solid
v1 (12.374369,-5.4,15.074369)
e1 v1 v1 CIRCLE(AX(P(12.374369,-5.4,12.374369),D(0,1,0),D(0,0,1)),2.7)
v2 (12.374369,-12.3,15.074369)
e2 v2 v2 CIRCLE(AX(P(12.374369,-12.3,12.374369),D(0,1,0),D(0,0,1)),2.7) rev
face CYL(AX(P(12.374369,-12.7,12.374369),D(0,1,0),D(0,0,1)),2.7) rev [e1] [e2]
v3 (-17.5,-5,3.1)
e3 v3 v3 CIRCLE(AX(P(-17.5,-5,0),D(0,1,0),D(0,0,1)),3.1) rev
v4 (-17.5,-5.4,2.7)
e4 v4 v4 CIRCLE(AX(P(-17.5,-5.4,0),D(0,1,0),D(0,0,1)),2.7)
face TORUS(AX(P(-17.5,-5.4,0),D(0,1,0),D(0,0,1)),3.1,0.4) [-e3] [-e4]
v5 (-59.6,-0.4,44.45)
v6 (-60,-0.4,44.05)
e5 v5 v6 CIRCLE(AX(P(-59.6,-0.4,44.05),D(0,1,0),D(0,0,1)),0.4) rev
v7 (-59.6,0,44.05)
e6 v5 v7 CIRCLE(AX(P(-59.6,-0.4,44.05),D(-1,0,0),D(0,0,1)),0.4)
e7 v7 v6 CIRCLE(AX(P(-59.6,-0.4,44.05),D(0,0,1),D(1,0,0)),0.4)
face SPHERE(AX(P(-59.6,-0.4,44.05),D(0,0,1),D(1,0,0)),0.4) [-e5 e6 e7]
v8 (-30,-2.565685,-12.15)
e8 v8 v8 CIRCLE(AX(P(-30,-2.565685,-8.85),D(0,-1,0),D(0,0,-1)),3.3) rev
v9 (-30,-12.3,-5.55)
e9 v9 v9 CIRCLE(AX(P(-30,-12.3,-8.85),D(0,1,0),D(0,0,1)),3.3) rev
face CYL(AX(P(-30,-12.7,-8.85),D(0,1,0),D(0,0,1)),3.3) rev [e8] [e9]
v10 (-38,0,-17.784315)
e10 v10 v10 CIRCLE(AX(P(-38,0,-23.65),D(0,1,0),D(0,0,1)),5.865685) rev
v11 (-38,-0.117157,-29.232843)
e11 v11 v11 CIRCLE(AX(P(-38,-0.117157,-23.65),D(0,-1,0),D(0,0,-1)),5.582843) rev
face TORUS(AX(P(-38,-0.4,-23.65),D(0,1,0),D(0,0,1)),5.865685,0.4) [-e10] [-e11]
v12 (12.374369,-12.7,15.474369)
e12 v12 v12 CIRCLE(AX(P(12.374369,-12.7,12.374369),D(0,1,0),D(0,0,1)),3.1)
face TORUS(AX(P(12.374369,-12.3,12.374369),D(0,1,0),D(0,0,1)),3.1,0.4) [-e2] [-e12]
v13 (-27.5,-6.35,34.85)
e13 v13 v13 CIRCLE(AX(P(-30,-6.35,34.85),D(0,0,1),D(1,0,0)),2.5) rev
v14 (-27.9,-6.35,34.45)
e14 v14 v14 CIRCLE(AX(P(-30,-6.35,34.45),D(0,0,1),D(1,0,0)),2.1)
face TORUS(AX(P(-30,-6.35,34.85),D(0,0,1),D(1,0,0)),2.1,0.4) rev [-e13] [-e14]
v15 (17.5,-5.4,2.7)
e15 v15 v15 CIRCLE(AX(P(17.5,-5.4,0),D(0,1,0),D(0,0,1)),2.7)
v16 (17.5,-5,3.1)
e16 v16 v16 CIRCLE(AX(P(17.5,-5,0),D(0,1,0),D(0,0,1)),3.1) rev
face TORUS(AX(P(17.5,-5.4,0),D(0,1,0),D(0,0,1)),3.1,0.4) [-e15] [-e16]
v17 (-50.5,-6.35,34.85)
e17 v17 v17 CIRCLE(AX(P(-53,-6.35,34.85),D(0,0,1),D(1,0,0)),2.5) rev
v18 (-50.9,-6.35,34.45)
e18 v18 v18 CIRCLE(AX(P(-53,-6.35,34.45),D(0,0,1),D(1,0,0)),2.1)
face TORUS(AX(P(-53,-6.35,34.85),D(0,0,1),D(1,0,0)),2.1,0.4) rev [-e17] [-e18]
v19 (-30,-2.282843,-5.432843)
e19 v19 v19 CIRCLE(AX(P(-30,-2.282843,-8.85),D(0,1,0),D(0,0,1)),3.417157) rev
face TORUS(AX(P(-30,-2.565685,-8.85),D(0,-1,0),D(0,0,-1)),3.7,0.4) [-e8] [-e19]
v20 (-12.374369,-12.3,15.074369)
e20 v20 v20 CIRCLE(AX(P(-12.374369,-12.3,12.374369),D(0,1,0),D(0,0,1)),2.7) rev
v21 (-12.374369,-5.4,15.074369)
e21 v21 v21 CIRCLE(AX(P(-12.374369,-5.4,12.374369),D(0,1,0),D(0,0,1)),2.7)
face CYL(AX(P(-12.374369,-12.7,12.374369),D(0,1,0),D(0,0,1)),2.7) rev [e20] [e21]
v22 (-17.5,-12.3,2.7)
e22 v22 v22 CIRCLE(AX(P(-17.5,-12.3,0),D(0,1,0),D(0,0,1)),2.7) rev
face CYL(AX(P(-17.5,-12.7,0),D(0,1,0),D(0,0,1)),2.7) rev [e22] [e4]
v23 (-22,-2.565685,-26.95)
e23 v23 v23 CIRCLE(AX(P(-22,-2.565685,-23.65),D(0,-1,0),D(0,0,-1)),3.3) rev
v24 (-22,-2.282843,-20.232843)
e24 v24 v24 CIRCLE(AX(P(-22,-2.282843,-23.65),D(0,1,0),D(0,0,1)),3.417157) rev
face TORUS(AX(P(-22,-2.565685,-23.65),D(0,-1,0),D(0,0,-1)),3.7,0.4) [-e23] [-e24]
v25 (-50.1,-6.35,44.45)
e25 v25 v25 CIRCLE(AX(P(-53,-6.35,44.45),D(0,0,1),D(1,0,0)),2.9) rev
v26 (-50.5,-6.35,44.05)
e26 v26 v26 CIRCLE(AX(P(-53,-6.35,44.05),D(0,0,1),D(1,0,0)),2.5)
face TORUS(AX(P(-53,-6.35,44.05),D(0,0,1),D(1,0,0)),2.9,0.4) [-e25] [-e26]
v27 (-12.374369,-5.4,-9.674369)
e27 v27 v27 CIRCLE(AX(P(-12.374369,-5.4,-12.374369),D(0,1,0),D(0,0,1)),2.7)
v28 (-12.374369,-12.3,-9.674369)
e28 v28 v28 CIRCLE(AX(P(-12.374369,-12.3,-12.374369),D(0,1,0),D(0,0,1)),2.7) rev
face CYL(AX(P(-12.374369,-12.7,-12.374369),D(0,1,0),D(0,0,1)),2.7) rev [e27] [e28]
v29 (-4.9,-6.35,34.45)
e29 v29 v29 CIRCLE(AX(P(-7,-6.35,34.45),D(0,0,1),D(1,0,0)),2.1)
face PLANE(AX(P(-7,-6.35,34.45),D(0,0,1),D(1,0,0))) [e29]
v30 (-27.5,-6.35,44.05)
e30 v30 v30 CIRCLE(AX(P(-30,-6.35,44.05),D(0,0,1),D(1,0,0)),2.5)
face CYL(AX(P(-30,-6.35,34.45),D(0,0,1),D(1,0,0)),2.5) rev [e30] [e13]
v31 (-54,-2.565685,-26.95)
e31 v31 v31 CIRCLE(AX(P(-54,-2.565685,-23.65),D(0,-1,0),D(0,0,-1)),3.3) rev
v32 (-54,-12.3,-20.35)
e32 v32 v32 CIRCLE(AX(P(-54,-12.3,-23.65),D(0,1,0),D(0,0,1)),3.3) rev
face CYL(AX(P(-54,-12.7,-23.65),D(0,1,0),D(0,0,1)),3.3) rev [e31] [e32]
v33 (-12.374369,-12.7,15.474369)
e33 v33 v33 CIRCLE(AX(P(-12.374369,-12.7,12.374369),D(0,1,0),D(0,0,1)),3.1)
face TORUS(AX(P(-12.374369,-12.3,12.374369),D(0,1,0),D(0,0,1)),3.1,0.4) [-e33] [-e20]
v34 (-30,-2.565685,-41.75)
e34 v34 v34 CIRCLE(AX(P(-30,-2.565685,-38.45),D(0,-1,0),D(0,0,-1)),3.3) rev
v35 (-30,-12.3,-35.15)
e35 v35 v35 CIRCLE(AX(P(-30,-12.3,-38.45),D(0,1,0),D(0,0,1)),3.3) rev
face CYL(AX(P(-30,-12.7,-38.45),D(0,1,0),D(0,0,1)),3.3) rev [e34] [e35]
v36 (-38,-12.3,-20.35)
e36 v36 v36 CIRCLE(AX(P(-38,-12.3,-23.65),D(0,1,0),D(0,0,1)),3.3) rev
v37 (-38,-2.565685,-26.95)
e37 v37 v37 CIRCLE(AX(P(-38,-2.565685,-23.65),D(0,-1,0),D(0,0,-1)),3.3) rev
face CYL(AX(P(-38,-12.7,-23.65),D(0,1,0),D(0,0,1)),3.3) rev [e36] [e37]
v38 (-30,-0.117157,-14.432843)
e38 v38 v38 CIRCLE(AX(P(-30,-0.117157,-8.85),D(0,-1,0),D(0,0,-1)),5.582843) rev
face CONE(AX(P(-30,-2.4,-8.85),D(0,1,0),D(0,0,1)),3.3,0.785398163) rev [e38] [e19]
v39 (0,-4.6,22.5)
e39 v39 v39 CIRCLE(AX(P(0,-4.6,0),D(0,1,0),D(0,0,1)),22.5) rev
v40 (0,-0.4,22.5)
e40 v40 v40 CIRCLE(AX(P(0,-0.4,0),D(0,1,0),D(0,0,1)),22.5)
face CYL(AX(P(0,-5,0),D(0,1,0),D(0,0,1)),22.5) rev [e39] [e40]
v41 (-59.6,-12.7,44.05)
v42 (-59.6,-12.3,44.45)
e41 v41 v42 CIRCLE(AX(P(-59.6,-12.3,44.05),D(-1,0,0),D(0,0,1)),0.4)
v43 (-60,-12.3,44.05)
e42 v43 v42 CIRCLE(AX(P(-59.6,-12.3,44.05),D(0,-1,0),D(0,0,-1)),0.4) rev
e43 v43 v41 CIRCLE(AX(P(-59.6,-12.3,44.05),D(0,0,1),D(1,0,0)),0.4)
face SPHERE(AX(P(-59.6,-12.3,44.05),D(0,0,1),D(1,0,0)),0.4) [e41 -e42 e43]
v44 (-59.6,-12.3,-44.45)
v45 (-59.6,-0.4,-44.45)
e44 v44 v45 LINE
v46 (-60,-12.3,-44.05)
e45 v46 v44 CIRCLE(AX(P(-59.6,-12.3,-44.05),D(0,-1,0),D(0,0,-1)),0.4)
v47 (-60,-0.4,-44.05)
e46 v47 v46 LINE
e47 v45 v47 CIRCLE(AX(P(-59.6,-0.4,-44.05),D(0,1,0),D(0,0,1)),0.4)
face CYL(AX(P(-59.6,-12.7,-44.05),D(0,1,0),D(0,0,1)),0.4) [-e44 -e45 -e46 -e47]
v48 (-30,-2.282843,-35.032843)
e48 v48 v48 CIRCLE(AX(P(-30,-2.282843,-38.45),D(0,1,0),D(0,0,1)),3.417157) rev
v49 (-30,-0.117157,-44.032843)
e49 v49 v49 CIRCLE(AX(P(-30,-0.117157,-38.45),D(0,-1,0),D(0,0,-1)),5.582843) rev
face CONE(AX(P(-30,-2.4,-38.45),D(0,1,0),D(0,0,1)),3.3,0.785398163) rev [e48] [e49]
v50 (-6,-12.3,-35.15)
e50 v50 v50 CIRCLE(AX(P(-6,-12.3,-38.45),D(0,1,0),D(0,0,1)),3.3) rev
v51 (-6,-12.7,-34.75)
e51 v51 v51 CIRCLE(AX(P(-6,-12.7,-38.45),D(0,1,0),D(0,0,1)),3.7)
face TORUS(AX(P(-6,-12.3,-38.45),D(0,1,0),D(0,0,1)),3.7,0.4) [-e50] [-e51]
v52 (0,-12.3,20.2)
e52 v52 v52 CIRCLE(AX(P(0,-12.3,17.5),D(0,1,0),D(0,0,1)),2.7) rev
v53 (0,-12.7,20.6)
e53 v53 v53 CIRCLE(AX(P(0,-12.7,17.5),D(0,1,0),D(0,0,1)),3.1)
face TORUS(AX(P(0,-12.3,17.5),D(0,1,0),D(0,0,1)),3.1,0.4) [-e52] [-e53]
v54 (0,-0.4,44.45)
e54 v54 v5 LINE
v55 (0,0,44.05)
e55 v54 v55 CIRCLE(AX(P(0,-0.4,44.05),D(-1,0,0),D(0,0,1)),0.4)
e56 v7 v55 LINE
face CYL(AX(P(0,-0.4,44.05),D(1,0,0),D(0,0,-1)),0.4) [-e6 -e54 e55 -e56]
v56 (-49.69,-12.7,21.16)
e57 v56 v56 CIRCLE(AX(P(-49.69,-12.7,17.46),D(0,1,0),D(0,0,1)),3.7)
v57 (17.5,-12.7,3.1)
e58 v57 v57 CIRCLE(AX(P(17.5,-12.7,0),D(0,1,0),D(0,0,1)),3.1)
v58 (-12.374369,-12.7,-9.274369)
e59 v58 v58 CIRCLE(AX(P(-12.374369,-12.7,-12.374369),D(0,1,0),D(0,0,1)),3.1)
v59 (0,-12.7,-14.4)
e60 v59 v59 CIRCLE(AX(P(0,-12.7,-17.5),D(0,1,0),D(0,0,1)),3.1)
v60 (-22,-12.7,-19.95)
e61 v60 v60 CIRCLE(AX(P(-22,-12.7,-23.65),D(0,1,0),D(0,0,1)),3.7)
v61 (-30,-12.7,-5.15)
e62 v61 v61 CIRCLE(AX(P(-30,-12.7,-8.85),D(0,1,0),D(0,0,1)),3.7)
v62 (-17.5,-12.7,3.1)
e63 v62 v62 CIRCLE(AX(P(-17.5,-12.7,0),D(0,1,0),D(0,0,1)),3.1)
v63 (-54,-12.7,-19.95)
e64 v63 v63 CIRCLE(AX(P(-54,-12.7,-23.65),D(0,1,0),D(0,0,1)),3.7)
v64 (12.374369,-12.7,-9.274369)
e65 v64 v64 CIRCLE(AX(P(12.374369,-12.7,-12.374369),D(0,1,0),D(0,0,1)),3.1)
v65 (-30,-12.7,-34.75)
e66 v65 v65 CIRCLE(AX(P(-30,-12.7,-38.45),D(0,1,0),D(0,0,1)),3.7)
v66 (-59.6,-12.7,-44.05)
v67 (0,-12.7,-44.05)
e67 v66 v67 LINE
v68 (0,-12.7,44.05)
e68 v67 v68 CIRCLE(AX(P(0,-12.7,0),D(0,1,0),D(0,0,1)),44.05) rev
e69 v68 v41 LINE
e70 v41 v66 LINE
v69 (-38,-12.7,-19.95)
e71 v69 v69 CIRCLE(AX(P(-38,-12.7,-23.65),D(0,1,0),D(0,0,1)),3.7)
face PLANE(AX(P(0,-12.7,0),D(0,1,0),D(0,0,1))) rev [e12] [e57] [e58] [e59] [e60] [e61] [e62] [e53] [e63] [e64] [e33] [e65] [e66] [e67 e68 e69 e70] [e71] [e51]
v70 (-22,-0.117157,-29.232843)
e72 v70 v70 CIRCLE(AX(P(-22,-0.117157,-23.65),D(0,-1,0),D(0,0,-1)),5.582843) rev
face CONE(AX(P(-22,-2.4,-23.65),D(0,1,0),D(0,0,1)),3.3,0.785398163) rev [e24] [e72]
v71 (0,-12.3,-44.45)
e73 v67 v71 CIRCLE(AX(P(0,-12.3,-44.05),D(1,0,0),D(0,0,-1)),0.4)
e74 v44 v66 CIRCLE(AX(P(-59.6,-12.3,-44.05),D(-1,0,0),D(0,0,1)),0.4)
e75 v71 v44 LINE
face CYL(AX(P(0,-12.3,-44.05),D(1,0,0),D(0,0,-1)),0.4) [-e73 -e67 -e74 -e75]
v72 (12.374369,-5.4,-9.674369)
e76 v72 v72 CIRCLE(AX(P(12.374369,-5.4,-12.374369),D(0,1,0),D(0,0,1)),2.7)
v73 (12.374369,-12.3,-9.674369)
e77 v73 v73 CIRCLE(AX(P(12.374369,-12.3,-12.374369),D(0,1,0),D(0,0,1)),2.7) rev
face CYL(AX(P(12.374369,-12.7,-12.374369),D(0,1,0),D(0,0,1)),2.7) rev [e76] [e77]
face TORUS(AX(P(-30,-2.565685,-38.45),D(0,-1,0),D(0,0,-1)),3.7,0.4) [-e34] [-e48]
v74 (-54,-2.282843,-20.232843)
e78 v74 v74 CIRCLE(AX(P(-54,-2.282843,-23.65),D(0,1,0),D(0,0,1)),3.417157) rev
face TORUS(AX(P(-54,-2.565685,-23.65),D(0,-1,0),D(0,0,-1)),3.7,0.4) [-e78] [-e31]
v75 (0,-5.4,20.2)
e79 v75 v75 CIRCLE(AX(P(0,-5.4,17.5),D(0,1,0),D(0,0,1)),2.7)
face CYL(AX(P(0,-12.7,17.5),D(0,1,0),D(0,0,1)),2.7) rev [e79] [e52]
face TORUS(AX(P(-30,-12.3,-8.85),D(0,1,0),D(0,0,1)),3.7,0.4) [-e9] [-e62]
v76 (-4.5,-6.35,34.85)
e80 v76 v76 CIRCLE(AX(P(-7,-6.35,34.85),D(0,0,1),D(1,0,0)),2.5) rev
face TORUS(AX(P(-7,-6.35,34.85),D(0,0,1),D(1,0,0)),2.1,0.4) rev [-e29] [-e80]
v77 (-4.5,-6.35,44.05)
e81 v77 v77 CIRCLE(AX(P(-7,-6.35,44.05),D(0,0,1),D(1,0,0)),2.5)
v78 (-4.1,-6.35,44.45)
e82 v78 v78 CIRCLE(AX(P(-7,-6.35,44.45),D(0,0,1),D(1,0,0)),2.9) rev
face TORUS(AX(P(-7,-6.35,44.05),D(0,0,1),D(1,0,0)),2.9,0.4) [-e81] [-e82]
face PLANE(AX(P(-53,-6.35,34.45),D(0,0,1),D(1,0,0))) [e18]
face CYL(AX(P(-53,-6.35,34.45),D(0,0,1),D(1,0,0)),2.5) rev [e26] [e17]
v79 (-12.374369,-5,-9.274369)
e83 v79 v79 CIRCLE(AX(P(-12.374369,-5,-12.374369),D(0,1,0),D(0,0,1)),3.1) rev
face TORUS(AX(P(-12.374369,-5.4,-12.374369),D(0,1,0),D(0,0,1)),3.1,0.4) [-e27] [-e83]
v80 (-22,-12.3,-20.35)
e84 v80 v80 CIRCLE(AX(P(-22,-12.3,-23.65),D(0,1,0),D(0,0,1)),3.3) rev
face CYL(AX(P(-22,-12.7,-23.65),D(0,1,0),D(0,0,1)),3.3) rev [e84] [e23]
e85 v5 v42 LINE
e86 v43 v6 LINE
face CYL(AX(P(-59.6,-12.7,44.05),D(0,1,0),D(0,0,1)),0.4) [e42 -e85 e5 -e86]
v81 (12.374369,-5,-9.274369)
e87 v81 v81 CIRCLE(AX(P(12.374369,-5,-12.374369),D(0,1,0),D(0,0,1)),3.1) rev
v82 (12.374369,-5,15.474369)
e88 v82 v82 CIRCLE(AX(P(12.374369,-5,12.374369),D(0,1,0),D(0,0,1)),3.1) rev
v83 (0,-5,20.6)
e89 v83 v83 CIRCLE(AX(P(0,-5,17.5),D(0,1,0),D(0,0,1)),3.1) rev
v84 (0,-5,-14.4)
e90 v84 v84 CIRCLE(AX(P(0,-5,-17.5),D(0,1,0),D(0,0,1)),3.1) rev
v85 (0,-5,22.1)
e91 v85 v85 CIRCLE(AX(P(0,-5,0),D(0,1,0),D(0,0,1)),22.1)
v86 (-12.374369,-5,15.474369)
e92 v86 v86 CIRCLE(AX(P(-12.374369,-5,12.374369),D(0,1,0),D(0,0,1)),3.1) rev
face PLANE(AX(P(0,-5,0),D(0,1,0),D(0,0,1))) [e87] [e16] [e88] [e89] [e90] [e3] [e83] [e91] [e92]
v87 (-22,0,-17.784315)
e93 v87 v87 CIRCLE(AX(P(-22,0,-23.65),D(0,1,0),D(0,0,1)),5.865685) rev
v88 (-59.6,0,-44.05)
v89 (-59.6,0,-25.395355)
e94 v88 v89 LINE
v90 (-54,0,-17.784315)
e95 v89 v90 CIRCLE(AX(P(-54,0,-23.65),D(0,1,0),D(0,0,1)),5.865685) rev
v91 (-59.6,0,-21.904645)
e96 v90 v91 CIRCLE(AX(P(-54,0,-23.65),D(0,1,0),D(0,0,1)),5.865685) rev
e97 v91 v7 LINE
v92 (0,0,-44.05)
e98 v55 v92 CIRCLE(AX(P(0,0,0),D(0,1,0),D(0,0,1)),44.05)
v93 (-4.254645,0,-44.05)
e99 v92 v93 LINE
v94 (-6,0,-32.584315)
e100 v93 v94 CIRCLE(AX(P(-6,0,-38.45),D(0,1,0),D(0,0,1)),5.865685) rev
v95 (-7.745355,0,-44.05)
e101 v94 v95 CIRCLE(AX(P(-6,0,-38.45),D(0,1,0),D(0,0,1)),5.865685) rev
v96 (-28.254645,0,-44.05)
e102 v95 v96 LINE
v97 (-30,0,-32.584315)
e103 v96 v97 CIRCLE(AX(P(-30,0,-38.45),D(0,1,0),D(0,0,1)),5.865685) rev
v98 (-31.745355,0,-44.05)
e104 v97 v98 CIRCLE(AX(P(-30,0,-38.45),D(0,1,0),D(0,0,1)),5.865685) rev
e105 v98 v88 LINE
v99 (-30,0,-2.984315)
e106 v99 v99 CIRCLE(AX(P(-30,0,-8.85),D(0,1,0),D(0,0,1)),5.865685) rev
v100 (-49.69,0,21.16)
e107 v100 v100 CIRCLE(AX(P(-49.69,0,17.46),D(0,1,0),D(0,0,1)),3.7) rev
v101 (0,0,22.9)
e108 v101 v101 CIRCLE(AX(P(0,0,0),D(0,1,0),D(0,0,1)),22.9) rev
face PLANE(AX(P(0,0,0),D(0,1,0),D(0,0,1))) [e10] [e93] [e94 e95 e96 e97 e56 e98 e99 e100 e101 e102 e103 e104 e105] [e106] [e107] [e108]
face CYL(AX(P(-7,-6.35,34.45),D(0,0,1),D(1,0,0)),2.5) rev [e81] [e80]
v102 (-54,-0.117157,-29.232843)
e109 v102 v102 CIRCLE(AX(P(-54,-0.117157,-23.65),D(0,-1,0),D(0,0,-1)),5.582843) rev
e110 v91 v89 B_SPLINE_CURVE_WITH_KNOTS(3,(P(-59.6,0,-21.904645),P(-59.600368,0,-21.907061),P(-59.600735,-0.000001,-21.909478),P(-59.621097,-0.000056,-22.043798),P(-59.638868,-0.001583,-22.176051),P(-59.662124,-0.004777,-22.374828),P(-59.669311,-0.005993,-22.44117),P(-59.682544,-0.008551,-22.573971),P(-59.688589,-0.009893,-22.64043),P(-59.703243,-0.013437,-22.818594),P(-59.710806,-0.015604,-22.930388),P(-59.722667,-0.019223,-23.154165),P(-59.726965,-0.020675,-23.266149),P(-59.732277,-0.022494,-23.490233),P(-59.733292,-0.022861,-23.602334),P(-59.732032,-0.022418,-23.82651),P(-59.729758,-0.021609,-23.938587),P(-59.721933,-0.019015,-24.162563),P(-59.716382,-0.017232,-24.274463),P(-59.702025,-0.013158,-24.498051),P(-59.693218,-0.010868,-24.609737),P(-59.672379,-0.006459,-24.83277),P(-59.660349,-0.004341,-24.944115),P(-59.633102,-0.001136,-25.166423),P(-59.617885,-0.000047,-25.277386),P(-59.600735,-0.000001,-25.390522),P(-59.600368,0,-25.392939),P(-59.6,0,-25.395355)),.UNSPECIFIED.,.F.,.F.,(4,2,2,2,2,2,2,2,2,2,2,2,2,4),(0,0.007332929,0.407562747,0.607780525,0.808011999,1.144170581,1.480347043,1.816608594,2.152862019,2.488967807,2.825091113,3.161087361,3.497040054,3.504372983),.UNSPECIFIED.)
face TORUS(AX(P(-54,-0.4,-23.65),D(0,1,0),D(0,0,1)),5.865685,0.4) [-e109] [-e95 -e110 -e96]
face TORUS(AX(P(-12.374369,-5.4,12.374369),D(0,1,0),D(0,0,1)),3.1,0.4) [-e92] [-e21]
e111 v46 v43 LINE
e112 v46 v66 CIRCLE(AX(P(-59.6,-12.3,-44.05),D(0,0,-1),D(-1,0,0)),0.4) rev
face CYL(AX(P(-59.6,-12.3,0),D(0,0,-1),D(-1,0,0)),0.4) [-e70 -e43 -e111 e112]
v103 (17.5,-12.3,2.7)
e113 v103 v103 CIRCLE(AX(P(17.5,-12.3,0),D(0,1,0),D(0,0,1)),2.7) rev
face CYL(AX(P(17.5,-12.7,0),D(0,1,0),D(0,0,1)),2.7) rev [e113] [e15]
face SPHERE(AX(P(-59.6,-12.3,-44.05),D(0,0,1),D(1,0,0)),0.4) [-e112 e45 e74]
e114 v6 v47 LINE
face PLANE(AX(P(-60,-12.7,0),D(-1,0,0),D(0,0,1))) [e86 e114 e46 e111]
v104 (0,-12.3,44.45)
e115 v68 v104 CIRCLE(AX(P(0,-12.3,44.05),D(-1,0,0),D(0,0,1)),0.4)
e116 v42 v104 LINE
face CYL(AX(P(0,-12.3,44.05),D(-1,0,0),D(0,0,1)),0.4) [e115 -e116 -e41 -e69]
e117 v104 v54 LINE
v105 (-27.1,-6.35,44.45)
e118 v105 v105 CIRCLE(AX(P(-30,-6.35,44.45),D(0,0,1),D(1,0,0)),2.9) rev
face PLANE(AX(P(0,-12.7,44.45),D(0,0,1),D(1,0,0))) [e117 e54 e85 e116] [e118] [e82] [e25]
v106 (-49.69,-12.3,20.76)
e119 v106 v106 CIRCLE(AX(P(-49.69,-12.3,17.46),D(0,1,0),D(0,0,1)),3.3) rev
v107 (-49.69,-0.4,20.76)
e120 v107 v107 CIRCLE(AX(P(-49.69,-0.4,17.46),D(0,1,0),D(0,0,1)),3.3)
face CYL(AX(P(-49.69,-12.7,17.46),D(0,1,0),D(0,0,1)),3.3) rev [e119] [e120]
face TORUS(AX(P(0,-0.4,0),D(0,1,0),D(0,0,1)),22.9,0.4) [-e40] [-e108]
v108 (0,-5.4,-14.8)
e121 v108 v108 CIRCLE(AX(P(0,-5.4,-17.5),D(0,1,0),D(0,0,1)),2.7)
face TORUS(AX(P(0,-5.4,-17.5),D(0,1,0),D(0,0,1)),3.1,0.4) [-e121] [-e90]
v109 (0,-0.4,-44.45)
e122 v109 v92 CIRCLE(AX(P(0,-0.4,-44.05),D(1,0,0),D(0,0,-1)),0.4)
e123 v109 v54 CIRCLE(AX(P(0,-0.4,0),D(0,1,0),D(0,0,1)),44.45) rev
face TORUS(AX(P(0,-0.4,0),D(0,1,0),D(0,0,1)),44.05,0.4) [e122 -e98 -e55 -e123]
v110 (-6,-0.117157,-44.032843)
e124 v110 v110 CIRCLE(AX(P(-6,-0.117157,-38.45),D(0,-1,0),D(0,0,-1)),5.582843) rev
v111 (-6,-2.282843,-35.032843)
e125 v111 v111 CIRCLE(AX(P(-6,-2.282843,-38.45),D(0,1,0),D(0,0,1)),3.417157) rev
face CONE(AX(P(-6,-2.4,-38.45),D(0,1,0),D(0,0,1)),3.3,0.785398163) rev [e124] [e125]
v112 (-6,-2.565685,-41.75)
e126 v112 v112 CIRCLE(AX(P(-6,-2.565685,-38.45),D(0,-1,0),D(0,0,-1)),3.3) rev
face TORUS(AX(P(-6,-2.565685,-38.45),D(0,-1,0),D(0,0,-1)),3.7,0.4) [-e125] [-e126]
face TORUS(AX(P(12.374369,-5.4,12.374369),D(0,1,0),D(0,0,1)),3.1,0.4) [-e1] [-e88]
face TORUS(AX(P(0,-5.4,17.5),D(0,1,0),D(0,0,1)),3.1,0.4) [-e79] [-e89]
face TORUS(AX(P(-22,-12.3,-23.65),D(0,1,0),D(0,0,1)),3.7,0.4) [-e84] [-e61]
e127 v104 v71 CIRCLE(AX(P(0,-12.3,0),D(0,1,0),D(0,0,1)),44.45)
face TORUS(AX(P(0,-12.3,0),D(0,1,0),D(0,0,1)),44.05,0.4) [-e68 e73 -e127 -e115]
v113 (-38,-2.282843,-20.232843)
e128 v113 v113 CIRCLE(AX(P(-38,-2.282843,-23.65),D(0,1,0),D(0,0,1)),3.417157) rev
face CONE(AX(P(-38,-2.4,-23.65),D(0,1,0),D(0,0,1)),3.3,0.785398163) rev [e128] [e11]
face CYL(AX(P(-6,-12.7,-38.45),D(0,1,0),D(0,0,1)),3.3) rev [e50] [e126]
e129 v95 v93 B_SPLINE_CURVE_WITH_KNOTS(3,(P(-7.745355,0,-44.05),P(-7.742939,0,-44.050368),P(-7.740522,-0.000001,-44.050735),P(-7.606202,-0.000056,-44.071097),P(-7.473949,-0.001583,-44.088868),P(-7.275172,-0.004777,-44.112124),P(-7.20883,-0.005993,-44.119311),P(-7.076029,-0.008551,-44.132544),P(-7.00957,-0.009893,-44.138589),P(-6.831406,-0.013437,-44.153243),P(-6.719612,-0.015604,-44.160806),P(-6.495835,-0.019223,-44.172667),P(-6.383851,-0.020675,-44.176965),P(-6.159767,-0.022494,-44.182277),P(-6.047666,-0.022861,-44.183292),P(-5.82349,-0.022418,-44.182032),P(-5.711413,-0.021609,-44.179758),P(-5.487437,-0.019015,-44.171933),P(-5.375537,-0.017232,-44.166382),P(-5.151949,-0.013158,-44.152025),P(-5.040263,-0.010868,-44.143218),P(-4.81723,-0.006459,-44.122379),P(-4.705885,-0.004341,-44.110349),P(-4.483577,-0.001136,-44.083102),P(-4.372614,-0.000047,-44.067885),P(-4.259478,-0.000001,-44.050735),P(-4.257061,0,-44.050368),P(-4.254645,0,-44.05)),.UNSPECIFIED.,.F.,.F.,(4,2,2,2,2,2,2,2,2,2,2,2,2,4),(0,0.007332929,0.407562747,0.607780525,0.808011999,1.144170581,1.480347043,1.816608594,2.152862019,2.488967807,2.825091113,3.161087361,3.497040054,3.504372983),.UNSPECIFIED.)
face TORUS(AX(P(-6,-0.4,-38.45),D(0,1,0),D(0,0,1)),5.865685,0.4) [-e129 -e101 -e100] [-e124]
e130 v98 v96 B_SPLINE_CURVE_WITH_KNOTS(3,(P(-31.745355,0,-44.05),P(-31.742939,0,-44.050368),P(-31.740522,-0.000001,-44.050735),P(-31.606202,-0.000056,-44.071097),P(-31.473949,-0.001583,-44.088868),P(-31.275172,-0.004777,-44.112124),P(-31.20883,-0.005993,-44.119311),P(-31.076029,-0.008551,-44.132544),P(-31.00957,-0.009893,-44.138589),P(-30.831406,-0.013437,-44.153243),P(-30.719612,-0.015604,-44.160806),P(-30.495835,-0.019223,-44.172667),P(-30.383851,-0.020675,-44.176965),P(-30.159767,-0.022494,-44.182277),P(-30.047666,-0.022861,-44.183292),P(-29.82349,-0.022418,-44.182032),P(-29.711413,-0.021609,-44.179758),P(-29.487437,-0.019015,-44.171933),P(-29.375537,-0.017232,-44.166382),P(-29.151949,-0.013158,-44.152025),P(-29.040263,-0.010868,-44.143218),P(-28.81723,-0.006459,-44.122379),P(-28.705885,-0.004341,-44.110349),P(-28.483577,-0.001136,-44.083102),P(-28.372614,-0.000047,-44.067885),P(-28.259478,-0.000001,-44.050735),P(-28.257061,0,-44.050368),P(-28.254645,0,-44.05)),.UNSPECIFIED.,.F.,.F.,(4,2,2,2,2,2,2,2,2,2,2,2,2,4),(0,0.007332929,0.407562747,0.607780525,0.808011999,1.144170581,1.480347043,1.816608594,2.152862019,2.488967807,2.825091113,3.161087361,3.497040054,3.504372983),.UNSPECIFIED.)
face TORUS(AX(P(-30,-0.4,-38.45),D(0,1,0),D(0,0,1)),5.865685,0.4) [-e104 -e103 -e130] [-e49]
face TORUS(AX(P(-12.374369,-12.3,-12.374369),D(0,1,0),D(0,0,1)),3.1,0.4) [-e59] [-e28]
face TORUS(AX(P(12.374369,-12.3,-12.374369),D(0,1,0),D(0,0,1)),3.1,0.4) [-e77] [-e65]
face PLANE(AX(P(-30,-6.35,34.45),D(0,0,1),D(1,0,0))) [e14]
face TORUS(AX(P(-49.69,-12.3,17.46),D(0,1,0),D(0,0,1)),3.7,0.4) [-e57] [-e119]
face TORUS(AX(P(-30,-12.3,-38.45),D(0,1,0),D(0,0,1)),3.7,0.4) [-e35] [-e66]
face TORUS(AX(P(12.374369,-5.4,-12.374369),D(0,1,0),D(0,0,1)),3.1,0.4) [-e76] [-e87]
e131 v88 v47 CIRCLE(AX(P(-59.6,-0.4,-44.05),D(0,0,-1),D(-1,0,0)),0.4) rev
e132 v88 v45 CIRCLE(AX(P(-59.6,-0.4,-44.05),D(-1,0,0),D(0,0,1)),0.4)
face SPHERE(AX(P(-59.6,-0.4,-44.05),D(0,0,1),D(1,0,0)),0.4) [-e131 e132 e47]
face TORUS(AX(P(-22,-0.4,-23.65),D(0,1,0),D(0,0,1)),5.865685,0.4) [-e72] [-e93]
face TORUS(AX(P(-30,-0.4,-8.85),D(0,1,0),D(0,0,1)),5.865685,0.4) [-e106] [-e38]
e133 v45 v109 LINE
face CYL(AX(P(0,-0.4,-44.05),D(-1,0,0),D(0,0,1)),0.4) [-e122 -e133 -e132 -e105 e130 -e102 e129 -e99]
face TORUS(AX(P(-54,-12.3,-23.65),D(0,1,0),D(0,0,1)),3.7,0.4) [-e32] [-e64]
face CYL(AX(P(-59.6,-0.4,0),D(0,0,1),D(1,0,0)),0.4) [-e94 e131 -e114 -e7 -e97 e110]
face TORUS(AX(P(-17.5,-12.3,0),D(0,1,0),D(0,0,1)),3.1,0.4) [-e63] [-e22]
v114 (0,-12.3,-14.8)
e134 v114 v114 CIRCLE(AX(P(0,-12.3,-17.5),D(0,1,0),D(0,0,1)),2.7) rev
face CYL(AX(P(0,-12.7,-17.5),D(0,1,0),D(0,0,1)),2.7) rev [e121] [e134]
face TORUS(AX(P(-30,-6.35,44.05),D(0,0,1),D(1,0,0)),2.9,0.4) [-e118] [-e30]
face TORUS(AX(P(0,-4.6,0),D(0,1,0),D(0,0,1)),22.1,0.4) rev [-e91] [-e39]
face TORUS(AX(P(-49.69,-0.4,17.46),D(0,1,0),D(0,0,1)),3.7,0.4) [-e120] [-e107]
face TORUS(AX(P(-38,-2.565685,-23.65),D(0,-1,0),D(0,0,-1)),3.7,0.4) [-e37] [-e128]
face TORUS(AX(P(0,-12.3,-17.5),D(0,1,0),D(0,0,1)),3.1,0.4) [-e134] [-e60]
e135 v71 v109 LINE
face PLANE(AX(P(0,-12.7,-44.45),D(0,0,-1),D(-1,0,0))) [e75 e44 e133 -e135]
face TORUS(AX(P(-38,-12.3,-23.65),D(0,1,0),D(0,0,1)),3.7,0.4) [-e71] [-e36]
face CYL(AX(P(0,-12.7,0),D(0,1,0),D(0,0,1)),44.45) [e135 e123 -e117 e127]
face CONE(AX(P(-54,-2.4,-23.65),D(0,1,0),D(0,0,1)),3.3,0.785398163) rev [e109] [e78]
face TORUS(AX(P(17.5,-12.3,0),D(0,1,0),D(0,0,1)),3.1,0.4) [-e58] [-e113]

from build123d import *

# Parameters (mm, degrees)
SKETCH1_R           = 3.3
SKETCH1_R_2         = 22.5
SKETCH1_R_3         = 2.7
BOSS_EXTRUDE1_DEPTH = 12.7
CHAMFER2_SIZE       = 2.4
SKETCH1_3_R         = 22.5
CUT_EXTRUDE1_DEPTH  = 5
SKETCH2_R           = 2.5
CUT_EXTRUDE2_DEPTH  = 10
FILLET1_R           = 0.4


with BuildPart() as part:
    # Sketch1 → Boss-Extrude1 (new body)
    # profile 1 of 2: a face of its own
    with BuildSketch(Plane(origin=(0, 0, 0), x_dir=(1, 0, 0), z_dir=(0, 1, 0))):
        with BuildLine():
            Line((-60, -44.45), (0, -44.45))
            ThreePointArc((0, -44.45), (44.45, 0), (0, 44.45))
            Line((0, 44.45), (-60, 44.45))
            Line((-60, 44.45), (-60, -44.45))
        make_face()
        with Locations(Location((-49.69, -17.46, 0), (0, 0, 270))):
            Circle(SKETCH1_R, mode=Mode.SUBTRACT)
        with Locations(Location((-54, 23.65, 0), (0, 0, 270))):
            Circle(SKETCH1_R, mode=Mode.SUBTRACT)
        with Locations(Location((-6, 38.45, 0), (0, 0, 270))):
            Circle(SKETCH1_R, mode=Mode.SUBTRACT)
        with Locations(Location((-38, 23.65, 0), (0, 0, 270))):
            Circle(SKETCH1_R, mode=Mode.SUBTRACT)
        with Locations(Location((-22, 23.65, 0), (0, 0, 270))):
            Circle(SKETCH1_R, mode=Mode.SUBTRACT)
        with Locations(Location((-30, 8.85, 0), (0, 0, 270))):
            Circle(SKETCH1_R, mode=Mode.SUBTRACT)
        with Locations(Location((-30, 38.45, 0), (0, 0, 270))):
            Circle(SKETCH1_R, mode=Mode.SUBTRACT)
        Circle(SKETCH1_R_2, mode=Mode.SUBTRACT)
    # profile 2 of 2: a face of its own
    with BuildSketch(Plane(origin=(0, 0, 0), x_dir=(1, 0, 0), z_dir=(0, 1, 0))):
        Circle(SKETCH1_R_2)
        with Locations(Location((17.5, 0, 0), (0, 0, 270))):
            Circle(SKETCH1_R_3, mode=Mode.SUBTRACT)
        with Locations(Location((12.374368671, -12.374368671, 0), (0, 0, 270))):
            Circle(SKETCH1_R_3, mode=Mode.SUBTRACT)
        with Locations(Location((0, -17.5, 0), (0, 0, 270))):
            Circle(SKETCH1_R_3, mode=Mode.SUBTRACT)
        with Locations(Location((-12.374368671, -12.374368671, 0), (0, 0, 270))):
            Circle(SKETCH1_R_3, mode=Mode.SUBTRACT)
        with Locations(Location((-17.5, 0, 0), (0, 0, 270))):
            Circle(SKETCH1_R_3, mode=Mode.SUBTRACT)
        with Locations(Location((-12.374368671, 12.374368671, 0), (0, 0, 270))):
            Circle(SKETCH1_R_3, mode=Mode.SUBTRACT)
        with Locations(Location((0, 17.5, 0), (0, 0, 270))):
            Circle(SKETCH1_R_3, mode=Mode.SUBTRACT)
        with Locations(Location((12.374368671, 12.374368671, 0), (0, 0, 270))):
            Circle(SKETCH1_R_3, mode=Mode.SUBTRACT)
    extrude(amount=-BOSS_EXTRUDE1_DEPTH)

    # Chamfer2
    chamfer2_edges = [part.edges().sort_by_distance(p)[0] for p in [
        (-30, 0, -41.75),
        (-30, 0, -12.15),
        (-22, 0, -26.95),
        (-38, 0, -26.95),
        (-6, 0, -41.75),
        (-54, 0, -26.95),
    ]]
    chamfer(chamfer2_edges, length=CHAMFER2_SIZE)

    # Sketch1<3> → Cut-Extrude1 (cut)
    with BuildSketch(Plane(origin=(0, 0, 0), x_dir=(1, 0, 0), z_dir=(0, 1, 0))):
        with Locations(Location((0, 0, 0), (0, 0, 270))):
            Circle(SKETCH1_3_R)
    extrude(amount=-CUT_EXTRUDE1_DEPTH, mode=Mode.SUBTRACT)

    # Sketch2 → Cut-Extrude2 (cut)
    with BuildSketch(Plane.XY.offset(44.45)):
        with Locations((-7, -6.35)):
            Circle(SKETCH2_R)
        with Locations((-30, -6.35)):
            Circle(SKETCH2_R)
        with Locations((-53, -6.35)):
            Circle(SKETCH2_R)
    extrude(amount=-CUT_EXTRUDE2_DEPTH, mode=Mode.SUBTRACT)

    # Fillet1
    # the kernel refuses this fillet: 0.4 mm, written as the material it adds along each edge
    with BuildSketch(Plane(origin=(-7, -6.35, 34.45), x_dir=(1, 0, 0), z_dir=(0, -1, 0))) as fillet1_piece_1:
        with BuildLine():
            CenterArc((2.5 - FILLET1_R, FILLET1_R), FILLET1_R, 270, 90)
            Line((2.5 - FILLET1_R, 0), (2.5, 0))
            Line((2.5, 0), (2.5, FILLET1_R))
        make_face()
    revolve(axis=Axis((-7, -6.35, 34.45), (0, 0, 1)))
    with BuildSketch(Plane(origin=(-30, -6.35, 34.45), x_dir=(1, 0, 0), z_dir=(0, -1, 0))) as fillet1_piece_2:
        with BuildLine():
            CenterArc((2.5 - FILLET1_R, FILLET1_R), FILLET1_R, 270, 90)
            Line((2.5 - FILLET1_R, 0), (2.5, 0))
            Line((2.5, 0), (2.5, FILLET1_R))
        make_face()
    revolve(axis=Axis((-30, -6.35, 34.45), (0, 0, 1)))
    with BuildSketch(Plane(origin=(-53, -6.35, 34.45), x_dir=(1, 0, 0), z_dir=(0, -1, 0))) as fillet1_piece_3:
        with BuildLine():
            CenterArc((2.5 - FILLET1_R, FILLET1_R), FILLET1_R, 270, 90)
            Line((2.5 - FILLET1_R, 0), (2.5, 0))
            Line((2.5, 0), (2.5, FILLET1_R))
        make_face()
    revolve(axis=Axis((-53, -6.35, 34.45), (0, 0, 1)))
    with BuildSketch(Plane(origin=(0, -5, 0), x_dir=(0, 0, 1), z_dir=(-1, 0, 0))) as fillet1_piece_4:
        with BuildLine():
            CenterArc((22.5 - FILLET1_R, FILLET1_R), FILLET1_R, 270, 90)
            Line((22.5 - FILLET1_R, 0), (22.5, 0))
            Line((22.5, 0), (22.5, FILLET1_R))
        make_face()
    revolve(axis=Axis((0, -5, 0), (0, 1, 0)))
    # the kernel refuses this fillet: 0.4 mm, written as the material it takes off along each edge
    with BuildSketch(Plane(origin=(-59.6, -0.4, -44.05), x_dir=(0, 0, -1), z_dir=(0, 1, 0))) as fillet1_2_piece_1_section:
        Polygon((0, 0), (FILLET1_R, 0), (FILLET1_R, FILLET1_R), (0, FILLET1_R), align=None)
    fillet1_2_piece_1 = extrude(amount=FILLET1_R, mode=Mode.PRIVATE)
    fillet1_2_piece_1 = fillet1_2_piece_1 - Plane(origin=(-59.6, -0.4, -44.05), x_dir=(0.7071067811865475, 0, 0.7071067811865475), z_dir=(0, 1, 0)) * Sphere(FILLET1_R, mode=Mode.PRIVATE)
    add(fillet1_2_piece_1, mode=Mode.SUBTRACT)
    with BuildSketch(Plane(origin=(-59.6, -0.4, 44.05), x_dir=(-1, 0, 0), z_dir=(0, 1, 0))) as fillet1_2_piece_2_section:
        Polygon((0, 0), (FILLET1_R, 0), (FILLET1_R, FILLET1_R), (0, FILLET1_R), align=None)
    fillet1_2_piece_2 = extrude(amount=FILLET1_R, mode=Mode.PRIVATE)
    fillet1_2_piece_2 = fillet1_2_piece_2 - Plane(origin=(-59.6, -0.4, 44.05), x_dir=(0.7071067811865475, 0, -0.7071067811865475), z_dir=(0, 1, 0)) * Sphere(FILLET1_R, mode=Mode.PRIVATE)
    add(fillet1_2_piece_2, mode=Mode.SUBTRACT)
    with BuildSketch(Plane(origin=(-59.6, -12.3, 44.05), x_dir=(0, 0, 1), z_dir=(-1, 0, 0))) as fillet1_2_piece_3_section:
        Polygon((0, 0), (FILLET1_R, 0), (FILLET1_R, -FILLET1_R), (0, -FILLET1_R), align=None)
    fillet1_2_piece_3 = extrude(amount=FILLET1_R, mode=Mode.PRIVATE)
    fillet1_2_piece_3 = fillet1_2_piece_3 - Plane(origin=(-59.6, -12.3, 44.05), x_dir=(0, 0.7071067811865475, -0.7071067811865475), z_dir=(-1, 0, 0)) * Sphere(FILLET1_R, mode=Mode.PRIVATE)
    add(fillet1_2_piece_3, mode=Mode.SUBTRACT)
    with BuildSketch(Plane(origin=(-59.6, -12.3, -44.05), x_dir=(-1, 0, 0), z_dir=(0, 0, -1))) as fillet1_2_piece_4_section:
        Polygon((0, 0), (FILLET1_R, 0), (FILLET1_R, -FILLET1_R), (0, -FILLET1_R), align=None)
    fillet1_2_piece_4 = extrude(amount=FILLET1_R, mode=Mode.PRIVATE)
    fillet1_2_piece_4 = fillet1_2_piece_4 - Plane(origin=(-59.6, -12.3, -44.05), x_dir=(0.7071067811865475, 0.7071067811865475, 0), z_dir=(0, 0, -1)) * Sphere(FILLET1_R, mode=Mode.PRIVATE)
    add(fillet1_2_piece_4, mode=Mode.SUBTRACT)
    with BuildSketch(Plane(origin=(-7, -6.35, 44.45), x_dir=(1, 0, 0), z_dir=(0, -1, 0))) as fillet1_2_piece_5:
        with BuildLine():
            CenterArc((2.5 + FILLET1_R, -FILLET1_R), FILLET1_R, 90, 90)
            Line((2.5, -FILLET1_R), (2.5, 0))
            Line((2.5, 0), (2.5 + FILLET1_R, 0))
        make_face()
    revolve(axis=Axis((-7, -6.35, 44.45), (0, 0, 1)), mode=Mode.SUBTRACT)
    with BuildSketch(Plane(origin=(-30, -6.35, 44.45), x_dir=(1, 0, 0), z_dir=(0, -1, 0))) as fillet1_2_piece_6:
        with BuildLine():
            CenterArc((2.5 + FILLET1_R, -FILLET1_R), FILLET1_R, 90, 90)
            Line((2.5, -FILLET1_R), (2.5, 0))
            Line((2.5, 0), (2.5 + FILLET1_R, 0))
        make_face()
    revolve(axis=Axis((-30, -6.35, 44.45), (0, 0, 1)), mode=Mode.SUBTRACT)
    with BuildSketch(Plane(origin=(-53, -6.35, 44.45), x_dir=(1, 0, 0), z_dir=(0, -1, 0))) as fillet1_2_piece_7:
        with BuildLine():
            CenterArc((2.5 + FILLET1_R, -FILLET1_R), FILLET1_R, 90, 90)
            Line((2.5, -FILLET1_R), (2.5, 0))
            Line((2.5, 0), (2.5 + FILLET1_R, 0))
        make_face()
    revolve(axis=Axis((-53, -6.35, 44.45), (0, 0, 1)), mode=Mode.SUBTRACT)
    with BuildSketch(Plane(origin=(-49.69, -12.7, 17.46), x_dir=(0, 0, 1), z_dir=(-1, 0, 0))) as fillet1_2_piece_8:
        with BuildLine():
            CenterArc((3.3 + FILLET1_R, FILLET1_R), FILLET1_R, 180, 90)
            Line((3.3 + FILLET1_R, 0), (3.3, 0))
            Line((3.3, 0), (3.3, FILLET1_R))
        make_face()
    revolve(axis=Axis((-49.69, -12.7, 17.46), (0, 1, 0)), mode=Mode.SUBTRACT)
    with BuildSketch(Plane(origin=(-54, -12.7, -23.65), x_dir=(0, 0, 1), z_dir=(-1, 0, 0))) as fillet1_2_piece_9:
        with BuildLine():
            CenterArc((3.3 + FILLET1_R, FILLET1_R), FILLET1_R, 180, 90)
            Line((3.3, FILLET1_R), (3.3, 0))
            Line((3.3, 0), (3.3 + FILLET1_R, 0))
        make_face()
    revolve(axis=Axis((-54, -12.7, -23.65), (0, 1, 0)), mode=Mode.SUBTRACT)
    with BuildSketch(Plane(origin=(-60, 0, -44.05), x_dir=(1, 0, 0), z_dir=(0, 0, 1)), Plane(origin=(-60, -12.7, -44.05), x_dir=(0, 1, 0), z_dir=(0, 0, 1))) as fillet1_2_piece_10:
        with BuildLine():
            CenterArc((FILLET1_R, -FILLET1_R), FILLET1_R, 90, 90)
            Line((0, -FILLET1_R), (0, 0))
            Line((0, 0), (FILLET1_R, 0))
        make_face()
    extrude(amount=88.1, mode=Mode.SUBTRACT)
    with BuildSketch(Plane(origin=(0, 0, -44.45), x_dir=(0, 0, 1), z_dir=(-1, 0, 0)), Plane(origin=(-59.6, 0, 44.45), x_dir=(0, 0, -1), z_dir=(1, 0, 0)), Plane(origin=(-59.6, -12.7, 44.45), x_dir=(0, 1, 0), z_dir=(1, 0, 0)), Plane(origin=(0, -12.7, -44.45), x_dir=(0, 1, 0), z_dir=(-1, 0, 0))) as fillet1_2_piece_11:
        with BuildLine():
            CenterArc((FILLET1_R, -FILLET1_R), FILLET1_R, 90, 90)
            Line((0, -FILLET1_R), (0, 0))
            Line((0, 0), (FILLET1_R, 0))
        make_face()
    extrude(amount=59.6, mode=Mode.SUBTRACT)
    with BuildSketch(Plane(origin=(0, 0, 0), x_dir=(0, 0, 1), z_dir=(-1, 0, 0))) as fillet1_2_piece_12:
        with BuildLine():
            CenterArc((44.45 - FILLET1_R, -FILLET1_R), FILLET1_R, 0, 90)
            Line((44.45, -FILLET1_R), (44.45, 0))
            Line((44.45, 0), (44.45 - FILLET1_R, 0))
        make_face()
    revolve(axis=Axis((0, 0, 0), (0, 1, 0)), revolution_arc=180, mode=Mode.SUBTRACT)
    with BuildSketch(Plane(origin=(-6, -12.7, -38.45), x_dir=(0, 0, 1), z_dir=(-1, 0, 0))) as fillet1_2_piece_13:
        with BuildLine():
            CenterArc((3.3 + FILLET1_R, FILLET1_R), FILLET1_R, 180, 90)
            Line((3.3, FILLET1_R), (3.3, 0))
            Line((3.3, 0), (3.3 + FILLET1_R, 0))
        make_face()
    revolve(axis=Axis((-6, -12.7, -38.45), (0, 1, 0)), mode=Mode.SUBTRACT)
    with BuildSketch(Plane(origin=(-49.69, 0, 17.46), x_dir=(0, 0, 1), z_dir=(-1, 0, 0))) as fillet1_2_piece_14:
        with BuildLine():
            CenterArc((3.3 + FILLET1_R, -FILLET1_R), FILLET1_R, 90, 90)
            Line((3.3, -FILLET1_R), (3.3, 0))
            Line((3.3, 0), (3.3 + FILLET1_R, 0))
        make_face()
    revolve(axis=Axis((-49.69, 0, 17.46), (0, 1, 0)), mode=Mode.SUBTRACT)
    with BuildSketch(Plane(origin=(-38, -12.7, -23.65), x_dir=(0, 0, 1), z_dir=(-1, 0, 0))) as fillet1_2_piece_15:
        with BuildLine():
            CenterArc((3.3 + FILLET1_R, FILLET1_R), FILLET1_R, 180, 90)
            Line((3.3, FILLET1_R), (3.3, 0))
            Line((3.3, 0), (3.3 + FILLET1_R, 0))
        make_face()
    revolve(axis=Axis((-38, -12.7, -23.65), (0, 1, 0)), mode=Mode.SUBTRACT)
    with BuildSketch(Plane(origin=(-60, -0.4, 44.45), x_dir=(0, 0, -1), z_dir=(0, -1, 0)), Plane(origin=(-60, -0.4, -44.45), x_dir=(1, 0, 0), z_dir=(0, -1, 0))) as fillet1_2_piece_16:
        with BuildLine():
            CenterArc((FILLET1_R, FILLET1_R), FILLET1_R, 180, 90)
            Line((0, FILLET1_R), (0, 0))
            Line((0, 0), (FILLET1_R, 0))
        make_face()
    extrude(amount=11.9, mode=Mode.SUBTRACT)
    with BuildSketch(Plane(origin=(-22, -12.7, -23.65), x_dir=(0, 0, 1), z_dir=(-1, 0, 0))) as fillet1_2_piece_17:
        with BuildLine():
            CenterArc((3.3 + FILLET1_R, FILLET1_R), FILLET1_R, 180, 90)
            Line((3.3, FILLET1_R), (3.3, 0))
            Line((3.3, 0), (3.3 + FILLET1_R, 0))
        make_face()
    revolve(axis=Axis((-22, -12.7, -23.65), (0, 1, 0)), mode=Mode.SUBTRACT)
    with BuildSketch(Plane(origin=(-30, -12.7, -8.85), x_dir=(0, 0, 1), z_dir=(-1, 0, 0))) as fillet1_2_piece_18:
        with BuildLine():
            CenterArc((3.3 + FILLET1_R, FILLET1_R), FILLET1_R, 180, 90)
            Line((3.3, FILLET1_R), (3.3, 0))
            Line((3.3, 0), (3.3 + FILLET1_R, 0))
        make_face()
    revolve(axis=Axis((-30, -12.7, -8.85), (0, 1, 0)), mode=Mode.SUBTRACT)
    with BuildSketch(Plane(origin=(-30, -12.7, -38.45), x_dir=(0, 0, 1), z_dir=(-1, 0, 0))) as fillet1_2_piece_19:
        with BuildLine():
            CenterArc((3.3 + FILLET1_R, FILLET1_R), FILLET1_R, 180, 90)
            Line((3.3, FILLET1_R), (3.3, 0))
            Line((3.3, 0), (3.3 + FILLET1_R, 0))
        make_face()
    revolve(axis=Axis((-30, -12.7, -38.45), (0, 1, 0)), mode=Mode.SUBTRACT)
    with BuildSketch(Plane(origin=(0, -12.7, 0), x_dir=(0, 0, 1), z_dir=(-1, 0, 0))) as fillet1_2_piece_20:
        with BuildLine():
            CenterArc((44.45 - FILLET1_R, FILLET1_R), FILLET1_R, 270, 90)
            Line((44.45 - FILLET1_R, 0), (44.45, 0))
            Line((44.45, 0), (44.45, FILLET1_R))
        make_face()
    revolve(axis=Axis((0, -12.7, 0), (0, 1, 0)), revolution_arc=180, mode=Mode.SUBTRACT)
    with BuildSketch(Plane(origin=(-6, -2.4, -38.45), x_dir=(0, 0, 1), z_dir=(-1, 0, 0))) as fillet1_2_piece_21:
        with BuildLine():
            CenterArc((3.3 + FILLET1_R, -FILLET1_R * 0.414213562373), FILLET1_R, 135, 45)
            Line((3.3, -FILLET1_R * 0.414213562373), (3.3, 0))
            Line((3.3, 0), (3.3 + FILLET1_R * 0.292893218813, FILLET1_R * 0.292893218813))
        make_face()
    revolve(axis=Axis((-6, -2.4, -38.45), (0, 1, 0)), mode=Mode.SUBTRACT)
    with BuildSketch(Plane(origin=(-54, 0, -23.65), x_dir=(0, 0, 1), z_dir=(-1, 0, 0))) as fillet1_2_piece_22:
        with BuildLine():
            CenterArc((5.7 + FILLET1_R * 0.414213562373, -FILLET1_R), FILLET1_R, 90, 45)
            Line((5.7 - FILLET1_R * 0.292893218813, -FILLET1_R * 0.292893218813), (5.7, 0))
            Line((5.7, 0), (5.7 + FILLET1_R * 0.414213562373, 0))
        make_face()
    revolve(axis=Axis((-54, 0, -23.65), (0, 1, 0)), mode=Mode.SUBTRACT)
    with BuildSketch(Plane(origin=(-38, 0, -23.65), x_dir=(0, 0, 1), z_dir=(-1, 0, 0))) as fillet1_2_piece_23:
        with BuildLine():
            CenterArc((5.7 + FILLET1_R * 0.414213562373, -FILLET1_R), FILLET1_R, 90, 45)
            Line((5.7 - FILLET1_R * 0.292893218813, -FILLET1_R * 0.292893218813), (5.7, 0))
            Line((5.7, 0), (5.7 + FILLET1_R * 0.414213562373, 0))
        make_face()
    revolve(axis=Axis((-38, 0, -23.65), (0, 1, 0)), mode=Mode.SUBTRACT)
    with BuildSketch(Plane(origin=(-30, 0, -38.45), x_dir=(0, 0, 1), z_dir=(-1, 0, 0))) as fillet1_2_piece_24:
        with BuildLine():
            CenterArc((5.7 + FILLET1_R * 0.414213562373, -FILLET1_R), FILLET1_R, 90, 45)
            Line((5.7 - FILLET1_R * 0.292893218813, -FILLET1_R * 0.292893218813), (5.7, 0))
            Line((5.7, 0), (5.7 + FILLET1_R * 0.414213562373, 0))
        make_face()
    revolve(axis=Axis((-30, 0, -38.45), (0, 1, 0)), mode=Mode.SUBTRACT)
    with BuildSketch(Plane(origin=(-22, 0, -23.65), x_dir=(0, 0, 1), z_dir=(-1, 0, 0))) as fillet1_2_piece_25:
        with BuildLine():
            CenterArc((5.7 + FILLET1_R * 0.414213562373, -FILLET1_R), FILLET1_R, 90, 45)
            Line((5.7 - FILLET1_R * 0.292893218813, -FILLET1_R * 0.292893218813), (5.7, 0))
            Line((5.7, 0), (5.7 + FILLET1_R * 0.414213562373, 0))
        make_face()
    revolve(axis=Axis((-22, 0, -23.65), (0, 1, 0)), mode=Mode.SUBTRACT)
    with BuildSketch(Plane(origin=(-30, 0, -8.85), x_dir=(0, 0, 1), z_dir=(-1, 0, 0))) as fillet1_2_piece_26:
        with BuildLine():
            CenterArc((5.7 + FILLET1_R * 0.414213562373, -FILLET1_R), FILLET1_R, 90, 45)
            Line((5.7 - FILLET1_R * 0.292893218813, -FILLET1_R * 0.292893218813), (5.7, 0))
            Line((5.7, 0), (5.7 + FILLET1_R * 0.414213562373, 0))
        make_face()
    revolve(axis=Axis((-30, 0, -8.85), (0, 1, 0)), mode=Mode.SUBTRACT)
    with BuildSketch(Plane(origin=(-6, 0, -38.45), x_dir=(0, 0, 1), z_dir=(-1, 0, 0))) as fillet1_2_piece_27:
        with BuildLine():
            CenterArc((5.7 + FILLET1_R * 0.414213562373, -FILLET1_R), FILLET1_R, 90, 45)
            Line((5.7 - FILLET1_R * 0.292893218813, -FILLET1_R * 0.292893218813), (5.7, 0))
            Line((5.7, 0), (5.7 + FILLET1_R * 0.414213562373, 0))
        make_face()
    revolve(axis=Axis((-6, 0, -38.45), (0, 1, 0)), mode=Mode.SUBTRACT)
    with BuildSketch(Plane(origin=(-30, -2.4, -8.85), x_dir=(0, 0, 1), z_dir=(-1, 0, 0))) as fillet1_2_piece_28:
        with BuildLine():
            CenterArc((3.3 + FILLET1_R, -FILLET1_R * 0.414213562373), FILLET1_R, 135, 45)
            Line((3.3, -FILLET1_R * 0.414213562373), (3.3, 0))
            Line((3.3, 0), (3.3 + FILLET1_R * 0.292893218813, FILLET1_R * 0.292893218813))
        make_face()
    revolve(axis=Axis((-30, -2.4, -8.85), (0, 1, 0)), mode=Mode.SUBTRACT)
    with BuildSketch(Plane(origin=(-22, -2.4, -23.65), x_dir=(0, 0, 1), z_dir=(-1, 0, 0))) as fillet1_2_piece_29:
        with BuildLine():
            CenterArc((3.3 + FILLET1_R, -FILLET1_R * 0.414213562373), FILLET1_R, 135, 45)
            Line((3.3, -FILLET1_R * 0.414213562373), (3.3, 0))
            Line((3.3, 0), (3.3 + FILLET1_R * 0.292893218813, FILLET1_R * 0.292893218813))
        make_face()
    revolve(axis=Axis((-22, -2.4, -23.65), (0, 1, 0)), mode=Mode.SUBTRACT)
    with BuildSketch(Plane(origin=(-30, -2.4, -38.45), x_dir=(0, 0, 1), z_dir=(-1, 0, 0))) as fillet1_2_piece_30:
        with BuildLine():
            CenterArc((3.3 + FILLET1_R, -FILLET1_R * 0.414213562373), FILLET1_R, 135, 45)
            Line((3.3, -FILLET1_R * 0.414213562373), (3.3, 0))
            Line((3.3, 0), (3.3 + FILLET1_R * 0.292893218813, FILLET1_R * 0.292893218813))
        make_face()
    revolve(axis=Axis((-30, -2.4, -38.45), (0, 1, 0)), mode=Mode.SUBTRACT)
    with BuildSketch(Plane(origin=(-38, -2.4, -23.65), x_dir=(0, 0, 1), z_dir=(-1, 0, 0))) as fillet1_2_piece_31:
        with BuildLine():
            CenterArc((3.3 + FILLET1_R, -FILLET1_R * 0.414213562373), FILLET1_R, 135, 45)
            Line((3.3, -FILLET1_R * 0.414213562373), (3.3, 0))
            Line((3.3, 0), (3.3 + FILLET1_R * 0.292893218813, FILLET1_R * 0.292893218813))
        make_face()
    revolve(axis=Axis((-38, -2.4, -23.65), (0, 1, 0)), mode=Mode.SUBTRACT)
    with BuildSketch(Plane(origin=(-54, -2.4, -23.65), x_dir=(0, 0, 1), z_dir=(-1, 0, 0))) as fillet1_2_piece_32:
        with BuildLine():
            CenterArc((3.3 + FILLET1_R, -FILLET1_R * 0.414213562373), FILLET1_R, 135, 45)
            Line((3.3, -FILLET1_R * 0.414213562373), (3.3, 0))
            Line((3.3, 0), (3.3 + FILLET1_R * 0.292893218813, FILLET1_R * 0.292893218813))
        make_face()
    revolve(axis=Axis((-54, -2.4, -23.65), (0, 1, 0)), mode=Mode.SUBTRACT)
    with BuildSketch(Plane(origin=(17.5, -12.7, 0), x_dir=(0, 0, 1), z_dir=(-1, 0, 0))) as fillet1_2_piece_33:
        with BuildLine():
            CenterArc((2.7 + FILLET1_R, FILLET1_R), FILLET1_R, 180, 90)
            Line((2.7, FILLET1_R), (2.7, 0))
            Line((2.7, 0), (2.7 + FILLET1_R, 0))
        make_face()
    revolve(axis=Axis((17.5, -12.7, 0), (0, 1, 0)), mode=Mode.SUBTRACT)
    with BuildSketch(Plane(origin=(12.374368671, -12.7, 12.374368671), x_dir=(0, 0, 1), z_dir=(-1, 0, 0))) as fillet1_2_piece_34:
        with BuildLine():
            CenterArc((2.7 + FILLET1_R, FILLET1_R), FILLET1_R, 180, 90)
            Line((2.7, FILLET1_R), (2.7, 0))
            Line((2.7, 0), (2.7 + FILLET1_R, 0))
        make_face()
    revolve(axis=Axis((12.374368671, -12.7, 12.374368671), (0, 1, 0)), mode=Mode.SUBTRACT)
    with BuildSketch(Plane(origin=(0, -12.7, 17.5), x_dir=(0, 0, 1), z_dir=(-1, 0, 0))) as fillet1_2_piece_35:
        with BuildLine():
            CenterArc((2.7 + FILLET1_R, FILLET1_R), FILLET1_R, 180, 90)
            Line((2.7, FILLET1_R), (2.7, 0))
            Line((2.7, 0), (2.7 + FILLET1_R, 0))
        make_face()
    revolve(axis=Axis((0, -12.7, 17.5), (0, 1, 0)), mode=Mode.SUBTRACT)
    with BuildSketch(Plane(origin=(-12.374368671, -12.7, 12.374368671), x_dir=(0, 0, 1), z_dir=(-1, 0, 0))) as fillet1_2_piece_36:
        with BuildLine():
            CenterArc((2.7 + FILLET1_R, FILLET1_R), FILLET1_R, 180, 90)
            Line((2.7, FILLET1_R), (2.7, 0))
            Line((2.7, 0), (2.7 + FILLET1_R, 0))
        make_face()
    revolve(axis=Axis((-12.374368671, -12.7, 12.374368671), (0, 1, 0)), mode=Mode.SUBTRACT)
    with BuildSketch(Plane(origin=(-17.5, -12.7, 0), x_dir=(0, 0, 1), z_dir=(-1, 0, 0))) as fillet1_2_piece_37:
        with BuildLine():
            CenterArc((2.7 + FILLET1_R, FILLET1_R), FILLET1_R, 180, 90)
            Line((2.7, FILLET1_R), (2.7, 0))
            Line((2.7, 0), (2.7 + FILLET1_R, 0))
        make_face()
    revolve(axis=Axis((-17.5, -12.7, 0), (0, 1, 0)), mode=Mode.SUBTRACT)
    with BuildSketch(Plane(origin=(0, -5, -17.5), x_dir=(0, 0, 1), z_dir=(-1, 0, 0))) as fillet1_2_piece_38:
        with BuildLine():
            CenterArc((2.7 + FILLET1_R, -FILLET1_R), FILLET1_R, 90, 90)
            Line((2.7 + FILLET1_R, 0), (2.7, 0))
            Line((2.7, 0), (2.7, -FILLET1_R))
        make_face()
    revolve(axis=Axis((0, -5, -17.5), (0, 1, 0)), mode=Mode.SUBTRACT)
    with BuildSketch(Plane(origin=(-12.374368671, -5, -12.374368671), x_dir=(0, 0, 1), z_dir=(-1, 0, 0))) as fillet1_2_piece_39:
        with BuildLine():
            CenterArc((2.7 + FILLET1_R, -FILLET1_R), FILLET1_R, 90, 90)
            Line((2.7 + FILLET1_R, 0), (2.7, 0))
            Line((2.7, 0), (2.7, -FILLET1_R))
        make_face()
    revolve(axis=Axis((-12.374368671, -5, -12.374368671), (0, 1, 0)), mode=Mode.SUBTRACT)
    with BuildSketch(Plane(origin=(-17.5, -5, 0), x_dir=(0, 0, 1), z_dir=(-1, 0, 0))) as fillet1_2_piece_40:
        with BuildLine():
            CenterArc((2.7 + FILLET1_R, -FILLET1_R), FILLET1_R, 90, 90)
            Line((2.7 + FILLET1_R, 0), (2.7, 0))
            Line((2.7, 0), (2.7, -FILLET1_R))
        make_face()
    revolve(axis=Axis((-17.5, -5, 0), (0, 1, 0)), mode=Mode.SUBTRACT)
    with BuildSketch(Plane(origin=(-12.374368671, -5, 12.374368671), x_dir=(0, 0, 1), z_dir=(-1, 0, 0))) as fillet1_2_piece_41:
        with BuildLine():
            CenterArc((2.7 + FILLET1_R, -FILLET1_R), FILLET1_R, 90, 90)
            Line((2.7 + FILLET1_R, 0), (2.7, 0))
            Line((2.7, 0), (2.7, -FILLET1_R))
        make_face()
    revolve(axis=Axis((-12.374368671, -5, 12.374368671), (0, 1, 0)), mode=Mode.SUBTRACT)
    with BuildSketch(Plane(origin=(0, -5, 17.5), x_dir=(0, 0, 1), z_dir=(-1, 0, 0))) as fillet1_2_piece_42:
        with BuildLine():
            CenterArc((2.7 + FILLET1_R, -FILLET1_R), FILLET1_R, 90, 90)
            Line((2.7 + FILLET1_R, 0), (2.7, 0))
            Line((2.7, 0), (2.7, -FILLET1_R))
        make_face()
    revolve(axis=Axis((0, -5, 17.5), (0, 1, 0)), mode=Mode.SUBTRACT)
    with BuildSketch(Plane(origin=(12.374368671, -5, 12.374368671), x_dir=(0, 0, 1), z_dir=(-1, 0, 0))) as fillet1_2_piece_43:
        with BuildLine():
            CenterArc((2.7 + FILLET1_R, -FILLET1_R), FILLET1_R, 90, 90)
            Line((2.7 + FILLET1_R, 0), (2.7, 0))
            Line((2.7, 0), (2.7, -FILLET1_R))
        make_face()
    revolve(axis=Axis((12.374368671, -5, 12.374368671), (0, 1, 0)), mode=Mode.SUBTRACT)
    with BuildSketch(Plane(origin=(17.5, -5, 0), x_dir=(0, 0, 1), z_dir=(-1, 0, 0))) as fillet1_2_piece_44:
        with BuildLine():
            CenterArc((2.7 + FILLET1_R, -FILLET1_R), FILLET1_R, 90, 90)
            Line((2.7 + FILLET1_R, 0), (2.7, 0))
            Line((2.7, 0), (2.7, -FILLET1_R))
        make_face()
    revolve(axis=Axis((17.5, -5, 0), (0, 1, 0)), mode=Mode.SUBTRACT)
    with BuildSketch(Plane(origin=(0, 0, 0), x_dir=(0, 0, 1), z_dir=(-1, 0, 0))) as fillet1_2_piece_45:
        with BuildLine():
            CenterArc((22.5 + FILLET1_R, -FILLET1_R), FILLET1_R, 90, 90)
            Line((22.5, -FILLET1_R), (22.5, 0))
            Line((22.5, 0), (22.5 + FILLET1_R, 0))
        make_face()
    revolve(axis=Axis((0, 0, 0), (0, 1, 0)), mode=Mode.SUBTRACT)
    with BuildSketch(Plane(origin=(12.374368671, -5, -12.374368671), x_dir=(0, 0, 1), z_dir=(-1, 0, 0))) as fillet1_2_piece_46:
        with BuildLine():
            CenterArc((2.7 + FILLET1_R, -FILLET1_R), FILLET1_R, 90, 90)
            Line((2.7 + FILLET1_R, 0), (2.7, 0))
            Line((2.7, 0), (2.7, -FILLET1_R))
        make_face()
    revolve(axis=Axis((12.374368671, -5, -12.374368671), (0, 1, 0)), mode=Mode.SUBTRACT)
    with BuildSketch(Plane(origin=(-12.374368671, -12.7, -12.374368671), x_dir=(0, 0, 1), z_dir=(-1, 0, 0))) as fillet1_2_piece_47:
        with BuildLine():
            CenterArc((2.7 + FILLET1_R, FILLET1_R), FILLET1_R, 180, 90)
            Line((2.7, FILLET1_R), (2.7, 0))
            Line((2.7, 0), (2.7 + FILLET1_R, 0))
        make_face()
    revolve(axis=Axis((-12.374368671, -12.7, -12.374368671), (0, 1, 0)), mode=Mode.SUBTRACT)
    with BuildSketch(Plane(origin=(0, -12.7, -17.5), x_dir=(0, 0, 1), z_dir=(-1, 0, 0))) as fillet1_2_piece_48:
        with BuildLine():
            CenterArc((2.7 + FILLET1_R, FILLET1_R), FILLET1_R, 180, 90)
            Line((2.7, FILLET1_R), (2.7, 0))
            Line((2.7, 0), (2.7 + FILLET1_R, 0))
        make_face()
    revolve(axis=Axis((0, -12.7, -17.5), (0, 1, 0)), mode=Mode.SUBTRACT)
    with BuildSketch(Plane(origin=(12.374368671, -12.7, -12.374368671), x_dir=(0, 0, 1), z_dir=(-1, 0, 0))) as fillet1_2_piece_49:
        with BuildLine():
            CenterArc((2.7 + FILLET1_R, FILLET1_R), FILLET1_R, 180, 90)
            Line((2.7, FILLET1_R), (2.7, 0))
            Line((2.7, 0), (2.7 + FILLET1_R, 0))
        make_face()
    revolve(axis=Axis((12.374368671, -12.7, -12.374368671), (0, 1, 0)), mode=Mode.SUBTRACT)


solid = part.part
